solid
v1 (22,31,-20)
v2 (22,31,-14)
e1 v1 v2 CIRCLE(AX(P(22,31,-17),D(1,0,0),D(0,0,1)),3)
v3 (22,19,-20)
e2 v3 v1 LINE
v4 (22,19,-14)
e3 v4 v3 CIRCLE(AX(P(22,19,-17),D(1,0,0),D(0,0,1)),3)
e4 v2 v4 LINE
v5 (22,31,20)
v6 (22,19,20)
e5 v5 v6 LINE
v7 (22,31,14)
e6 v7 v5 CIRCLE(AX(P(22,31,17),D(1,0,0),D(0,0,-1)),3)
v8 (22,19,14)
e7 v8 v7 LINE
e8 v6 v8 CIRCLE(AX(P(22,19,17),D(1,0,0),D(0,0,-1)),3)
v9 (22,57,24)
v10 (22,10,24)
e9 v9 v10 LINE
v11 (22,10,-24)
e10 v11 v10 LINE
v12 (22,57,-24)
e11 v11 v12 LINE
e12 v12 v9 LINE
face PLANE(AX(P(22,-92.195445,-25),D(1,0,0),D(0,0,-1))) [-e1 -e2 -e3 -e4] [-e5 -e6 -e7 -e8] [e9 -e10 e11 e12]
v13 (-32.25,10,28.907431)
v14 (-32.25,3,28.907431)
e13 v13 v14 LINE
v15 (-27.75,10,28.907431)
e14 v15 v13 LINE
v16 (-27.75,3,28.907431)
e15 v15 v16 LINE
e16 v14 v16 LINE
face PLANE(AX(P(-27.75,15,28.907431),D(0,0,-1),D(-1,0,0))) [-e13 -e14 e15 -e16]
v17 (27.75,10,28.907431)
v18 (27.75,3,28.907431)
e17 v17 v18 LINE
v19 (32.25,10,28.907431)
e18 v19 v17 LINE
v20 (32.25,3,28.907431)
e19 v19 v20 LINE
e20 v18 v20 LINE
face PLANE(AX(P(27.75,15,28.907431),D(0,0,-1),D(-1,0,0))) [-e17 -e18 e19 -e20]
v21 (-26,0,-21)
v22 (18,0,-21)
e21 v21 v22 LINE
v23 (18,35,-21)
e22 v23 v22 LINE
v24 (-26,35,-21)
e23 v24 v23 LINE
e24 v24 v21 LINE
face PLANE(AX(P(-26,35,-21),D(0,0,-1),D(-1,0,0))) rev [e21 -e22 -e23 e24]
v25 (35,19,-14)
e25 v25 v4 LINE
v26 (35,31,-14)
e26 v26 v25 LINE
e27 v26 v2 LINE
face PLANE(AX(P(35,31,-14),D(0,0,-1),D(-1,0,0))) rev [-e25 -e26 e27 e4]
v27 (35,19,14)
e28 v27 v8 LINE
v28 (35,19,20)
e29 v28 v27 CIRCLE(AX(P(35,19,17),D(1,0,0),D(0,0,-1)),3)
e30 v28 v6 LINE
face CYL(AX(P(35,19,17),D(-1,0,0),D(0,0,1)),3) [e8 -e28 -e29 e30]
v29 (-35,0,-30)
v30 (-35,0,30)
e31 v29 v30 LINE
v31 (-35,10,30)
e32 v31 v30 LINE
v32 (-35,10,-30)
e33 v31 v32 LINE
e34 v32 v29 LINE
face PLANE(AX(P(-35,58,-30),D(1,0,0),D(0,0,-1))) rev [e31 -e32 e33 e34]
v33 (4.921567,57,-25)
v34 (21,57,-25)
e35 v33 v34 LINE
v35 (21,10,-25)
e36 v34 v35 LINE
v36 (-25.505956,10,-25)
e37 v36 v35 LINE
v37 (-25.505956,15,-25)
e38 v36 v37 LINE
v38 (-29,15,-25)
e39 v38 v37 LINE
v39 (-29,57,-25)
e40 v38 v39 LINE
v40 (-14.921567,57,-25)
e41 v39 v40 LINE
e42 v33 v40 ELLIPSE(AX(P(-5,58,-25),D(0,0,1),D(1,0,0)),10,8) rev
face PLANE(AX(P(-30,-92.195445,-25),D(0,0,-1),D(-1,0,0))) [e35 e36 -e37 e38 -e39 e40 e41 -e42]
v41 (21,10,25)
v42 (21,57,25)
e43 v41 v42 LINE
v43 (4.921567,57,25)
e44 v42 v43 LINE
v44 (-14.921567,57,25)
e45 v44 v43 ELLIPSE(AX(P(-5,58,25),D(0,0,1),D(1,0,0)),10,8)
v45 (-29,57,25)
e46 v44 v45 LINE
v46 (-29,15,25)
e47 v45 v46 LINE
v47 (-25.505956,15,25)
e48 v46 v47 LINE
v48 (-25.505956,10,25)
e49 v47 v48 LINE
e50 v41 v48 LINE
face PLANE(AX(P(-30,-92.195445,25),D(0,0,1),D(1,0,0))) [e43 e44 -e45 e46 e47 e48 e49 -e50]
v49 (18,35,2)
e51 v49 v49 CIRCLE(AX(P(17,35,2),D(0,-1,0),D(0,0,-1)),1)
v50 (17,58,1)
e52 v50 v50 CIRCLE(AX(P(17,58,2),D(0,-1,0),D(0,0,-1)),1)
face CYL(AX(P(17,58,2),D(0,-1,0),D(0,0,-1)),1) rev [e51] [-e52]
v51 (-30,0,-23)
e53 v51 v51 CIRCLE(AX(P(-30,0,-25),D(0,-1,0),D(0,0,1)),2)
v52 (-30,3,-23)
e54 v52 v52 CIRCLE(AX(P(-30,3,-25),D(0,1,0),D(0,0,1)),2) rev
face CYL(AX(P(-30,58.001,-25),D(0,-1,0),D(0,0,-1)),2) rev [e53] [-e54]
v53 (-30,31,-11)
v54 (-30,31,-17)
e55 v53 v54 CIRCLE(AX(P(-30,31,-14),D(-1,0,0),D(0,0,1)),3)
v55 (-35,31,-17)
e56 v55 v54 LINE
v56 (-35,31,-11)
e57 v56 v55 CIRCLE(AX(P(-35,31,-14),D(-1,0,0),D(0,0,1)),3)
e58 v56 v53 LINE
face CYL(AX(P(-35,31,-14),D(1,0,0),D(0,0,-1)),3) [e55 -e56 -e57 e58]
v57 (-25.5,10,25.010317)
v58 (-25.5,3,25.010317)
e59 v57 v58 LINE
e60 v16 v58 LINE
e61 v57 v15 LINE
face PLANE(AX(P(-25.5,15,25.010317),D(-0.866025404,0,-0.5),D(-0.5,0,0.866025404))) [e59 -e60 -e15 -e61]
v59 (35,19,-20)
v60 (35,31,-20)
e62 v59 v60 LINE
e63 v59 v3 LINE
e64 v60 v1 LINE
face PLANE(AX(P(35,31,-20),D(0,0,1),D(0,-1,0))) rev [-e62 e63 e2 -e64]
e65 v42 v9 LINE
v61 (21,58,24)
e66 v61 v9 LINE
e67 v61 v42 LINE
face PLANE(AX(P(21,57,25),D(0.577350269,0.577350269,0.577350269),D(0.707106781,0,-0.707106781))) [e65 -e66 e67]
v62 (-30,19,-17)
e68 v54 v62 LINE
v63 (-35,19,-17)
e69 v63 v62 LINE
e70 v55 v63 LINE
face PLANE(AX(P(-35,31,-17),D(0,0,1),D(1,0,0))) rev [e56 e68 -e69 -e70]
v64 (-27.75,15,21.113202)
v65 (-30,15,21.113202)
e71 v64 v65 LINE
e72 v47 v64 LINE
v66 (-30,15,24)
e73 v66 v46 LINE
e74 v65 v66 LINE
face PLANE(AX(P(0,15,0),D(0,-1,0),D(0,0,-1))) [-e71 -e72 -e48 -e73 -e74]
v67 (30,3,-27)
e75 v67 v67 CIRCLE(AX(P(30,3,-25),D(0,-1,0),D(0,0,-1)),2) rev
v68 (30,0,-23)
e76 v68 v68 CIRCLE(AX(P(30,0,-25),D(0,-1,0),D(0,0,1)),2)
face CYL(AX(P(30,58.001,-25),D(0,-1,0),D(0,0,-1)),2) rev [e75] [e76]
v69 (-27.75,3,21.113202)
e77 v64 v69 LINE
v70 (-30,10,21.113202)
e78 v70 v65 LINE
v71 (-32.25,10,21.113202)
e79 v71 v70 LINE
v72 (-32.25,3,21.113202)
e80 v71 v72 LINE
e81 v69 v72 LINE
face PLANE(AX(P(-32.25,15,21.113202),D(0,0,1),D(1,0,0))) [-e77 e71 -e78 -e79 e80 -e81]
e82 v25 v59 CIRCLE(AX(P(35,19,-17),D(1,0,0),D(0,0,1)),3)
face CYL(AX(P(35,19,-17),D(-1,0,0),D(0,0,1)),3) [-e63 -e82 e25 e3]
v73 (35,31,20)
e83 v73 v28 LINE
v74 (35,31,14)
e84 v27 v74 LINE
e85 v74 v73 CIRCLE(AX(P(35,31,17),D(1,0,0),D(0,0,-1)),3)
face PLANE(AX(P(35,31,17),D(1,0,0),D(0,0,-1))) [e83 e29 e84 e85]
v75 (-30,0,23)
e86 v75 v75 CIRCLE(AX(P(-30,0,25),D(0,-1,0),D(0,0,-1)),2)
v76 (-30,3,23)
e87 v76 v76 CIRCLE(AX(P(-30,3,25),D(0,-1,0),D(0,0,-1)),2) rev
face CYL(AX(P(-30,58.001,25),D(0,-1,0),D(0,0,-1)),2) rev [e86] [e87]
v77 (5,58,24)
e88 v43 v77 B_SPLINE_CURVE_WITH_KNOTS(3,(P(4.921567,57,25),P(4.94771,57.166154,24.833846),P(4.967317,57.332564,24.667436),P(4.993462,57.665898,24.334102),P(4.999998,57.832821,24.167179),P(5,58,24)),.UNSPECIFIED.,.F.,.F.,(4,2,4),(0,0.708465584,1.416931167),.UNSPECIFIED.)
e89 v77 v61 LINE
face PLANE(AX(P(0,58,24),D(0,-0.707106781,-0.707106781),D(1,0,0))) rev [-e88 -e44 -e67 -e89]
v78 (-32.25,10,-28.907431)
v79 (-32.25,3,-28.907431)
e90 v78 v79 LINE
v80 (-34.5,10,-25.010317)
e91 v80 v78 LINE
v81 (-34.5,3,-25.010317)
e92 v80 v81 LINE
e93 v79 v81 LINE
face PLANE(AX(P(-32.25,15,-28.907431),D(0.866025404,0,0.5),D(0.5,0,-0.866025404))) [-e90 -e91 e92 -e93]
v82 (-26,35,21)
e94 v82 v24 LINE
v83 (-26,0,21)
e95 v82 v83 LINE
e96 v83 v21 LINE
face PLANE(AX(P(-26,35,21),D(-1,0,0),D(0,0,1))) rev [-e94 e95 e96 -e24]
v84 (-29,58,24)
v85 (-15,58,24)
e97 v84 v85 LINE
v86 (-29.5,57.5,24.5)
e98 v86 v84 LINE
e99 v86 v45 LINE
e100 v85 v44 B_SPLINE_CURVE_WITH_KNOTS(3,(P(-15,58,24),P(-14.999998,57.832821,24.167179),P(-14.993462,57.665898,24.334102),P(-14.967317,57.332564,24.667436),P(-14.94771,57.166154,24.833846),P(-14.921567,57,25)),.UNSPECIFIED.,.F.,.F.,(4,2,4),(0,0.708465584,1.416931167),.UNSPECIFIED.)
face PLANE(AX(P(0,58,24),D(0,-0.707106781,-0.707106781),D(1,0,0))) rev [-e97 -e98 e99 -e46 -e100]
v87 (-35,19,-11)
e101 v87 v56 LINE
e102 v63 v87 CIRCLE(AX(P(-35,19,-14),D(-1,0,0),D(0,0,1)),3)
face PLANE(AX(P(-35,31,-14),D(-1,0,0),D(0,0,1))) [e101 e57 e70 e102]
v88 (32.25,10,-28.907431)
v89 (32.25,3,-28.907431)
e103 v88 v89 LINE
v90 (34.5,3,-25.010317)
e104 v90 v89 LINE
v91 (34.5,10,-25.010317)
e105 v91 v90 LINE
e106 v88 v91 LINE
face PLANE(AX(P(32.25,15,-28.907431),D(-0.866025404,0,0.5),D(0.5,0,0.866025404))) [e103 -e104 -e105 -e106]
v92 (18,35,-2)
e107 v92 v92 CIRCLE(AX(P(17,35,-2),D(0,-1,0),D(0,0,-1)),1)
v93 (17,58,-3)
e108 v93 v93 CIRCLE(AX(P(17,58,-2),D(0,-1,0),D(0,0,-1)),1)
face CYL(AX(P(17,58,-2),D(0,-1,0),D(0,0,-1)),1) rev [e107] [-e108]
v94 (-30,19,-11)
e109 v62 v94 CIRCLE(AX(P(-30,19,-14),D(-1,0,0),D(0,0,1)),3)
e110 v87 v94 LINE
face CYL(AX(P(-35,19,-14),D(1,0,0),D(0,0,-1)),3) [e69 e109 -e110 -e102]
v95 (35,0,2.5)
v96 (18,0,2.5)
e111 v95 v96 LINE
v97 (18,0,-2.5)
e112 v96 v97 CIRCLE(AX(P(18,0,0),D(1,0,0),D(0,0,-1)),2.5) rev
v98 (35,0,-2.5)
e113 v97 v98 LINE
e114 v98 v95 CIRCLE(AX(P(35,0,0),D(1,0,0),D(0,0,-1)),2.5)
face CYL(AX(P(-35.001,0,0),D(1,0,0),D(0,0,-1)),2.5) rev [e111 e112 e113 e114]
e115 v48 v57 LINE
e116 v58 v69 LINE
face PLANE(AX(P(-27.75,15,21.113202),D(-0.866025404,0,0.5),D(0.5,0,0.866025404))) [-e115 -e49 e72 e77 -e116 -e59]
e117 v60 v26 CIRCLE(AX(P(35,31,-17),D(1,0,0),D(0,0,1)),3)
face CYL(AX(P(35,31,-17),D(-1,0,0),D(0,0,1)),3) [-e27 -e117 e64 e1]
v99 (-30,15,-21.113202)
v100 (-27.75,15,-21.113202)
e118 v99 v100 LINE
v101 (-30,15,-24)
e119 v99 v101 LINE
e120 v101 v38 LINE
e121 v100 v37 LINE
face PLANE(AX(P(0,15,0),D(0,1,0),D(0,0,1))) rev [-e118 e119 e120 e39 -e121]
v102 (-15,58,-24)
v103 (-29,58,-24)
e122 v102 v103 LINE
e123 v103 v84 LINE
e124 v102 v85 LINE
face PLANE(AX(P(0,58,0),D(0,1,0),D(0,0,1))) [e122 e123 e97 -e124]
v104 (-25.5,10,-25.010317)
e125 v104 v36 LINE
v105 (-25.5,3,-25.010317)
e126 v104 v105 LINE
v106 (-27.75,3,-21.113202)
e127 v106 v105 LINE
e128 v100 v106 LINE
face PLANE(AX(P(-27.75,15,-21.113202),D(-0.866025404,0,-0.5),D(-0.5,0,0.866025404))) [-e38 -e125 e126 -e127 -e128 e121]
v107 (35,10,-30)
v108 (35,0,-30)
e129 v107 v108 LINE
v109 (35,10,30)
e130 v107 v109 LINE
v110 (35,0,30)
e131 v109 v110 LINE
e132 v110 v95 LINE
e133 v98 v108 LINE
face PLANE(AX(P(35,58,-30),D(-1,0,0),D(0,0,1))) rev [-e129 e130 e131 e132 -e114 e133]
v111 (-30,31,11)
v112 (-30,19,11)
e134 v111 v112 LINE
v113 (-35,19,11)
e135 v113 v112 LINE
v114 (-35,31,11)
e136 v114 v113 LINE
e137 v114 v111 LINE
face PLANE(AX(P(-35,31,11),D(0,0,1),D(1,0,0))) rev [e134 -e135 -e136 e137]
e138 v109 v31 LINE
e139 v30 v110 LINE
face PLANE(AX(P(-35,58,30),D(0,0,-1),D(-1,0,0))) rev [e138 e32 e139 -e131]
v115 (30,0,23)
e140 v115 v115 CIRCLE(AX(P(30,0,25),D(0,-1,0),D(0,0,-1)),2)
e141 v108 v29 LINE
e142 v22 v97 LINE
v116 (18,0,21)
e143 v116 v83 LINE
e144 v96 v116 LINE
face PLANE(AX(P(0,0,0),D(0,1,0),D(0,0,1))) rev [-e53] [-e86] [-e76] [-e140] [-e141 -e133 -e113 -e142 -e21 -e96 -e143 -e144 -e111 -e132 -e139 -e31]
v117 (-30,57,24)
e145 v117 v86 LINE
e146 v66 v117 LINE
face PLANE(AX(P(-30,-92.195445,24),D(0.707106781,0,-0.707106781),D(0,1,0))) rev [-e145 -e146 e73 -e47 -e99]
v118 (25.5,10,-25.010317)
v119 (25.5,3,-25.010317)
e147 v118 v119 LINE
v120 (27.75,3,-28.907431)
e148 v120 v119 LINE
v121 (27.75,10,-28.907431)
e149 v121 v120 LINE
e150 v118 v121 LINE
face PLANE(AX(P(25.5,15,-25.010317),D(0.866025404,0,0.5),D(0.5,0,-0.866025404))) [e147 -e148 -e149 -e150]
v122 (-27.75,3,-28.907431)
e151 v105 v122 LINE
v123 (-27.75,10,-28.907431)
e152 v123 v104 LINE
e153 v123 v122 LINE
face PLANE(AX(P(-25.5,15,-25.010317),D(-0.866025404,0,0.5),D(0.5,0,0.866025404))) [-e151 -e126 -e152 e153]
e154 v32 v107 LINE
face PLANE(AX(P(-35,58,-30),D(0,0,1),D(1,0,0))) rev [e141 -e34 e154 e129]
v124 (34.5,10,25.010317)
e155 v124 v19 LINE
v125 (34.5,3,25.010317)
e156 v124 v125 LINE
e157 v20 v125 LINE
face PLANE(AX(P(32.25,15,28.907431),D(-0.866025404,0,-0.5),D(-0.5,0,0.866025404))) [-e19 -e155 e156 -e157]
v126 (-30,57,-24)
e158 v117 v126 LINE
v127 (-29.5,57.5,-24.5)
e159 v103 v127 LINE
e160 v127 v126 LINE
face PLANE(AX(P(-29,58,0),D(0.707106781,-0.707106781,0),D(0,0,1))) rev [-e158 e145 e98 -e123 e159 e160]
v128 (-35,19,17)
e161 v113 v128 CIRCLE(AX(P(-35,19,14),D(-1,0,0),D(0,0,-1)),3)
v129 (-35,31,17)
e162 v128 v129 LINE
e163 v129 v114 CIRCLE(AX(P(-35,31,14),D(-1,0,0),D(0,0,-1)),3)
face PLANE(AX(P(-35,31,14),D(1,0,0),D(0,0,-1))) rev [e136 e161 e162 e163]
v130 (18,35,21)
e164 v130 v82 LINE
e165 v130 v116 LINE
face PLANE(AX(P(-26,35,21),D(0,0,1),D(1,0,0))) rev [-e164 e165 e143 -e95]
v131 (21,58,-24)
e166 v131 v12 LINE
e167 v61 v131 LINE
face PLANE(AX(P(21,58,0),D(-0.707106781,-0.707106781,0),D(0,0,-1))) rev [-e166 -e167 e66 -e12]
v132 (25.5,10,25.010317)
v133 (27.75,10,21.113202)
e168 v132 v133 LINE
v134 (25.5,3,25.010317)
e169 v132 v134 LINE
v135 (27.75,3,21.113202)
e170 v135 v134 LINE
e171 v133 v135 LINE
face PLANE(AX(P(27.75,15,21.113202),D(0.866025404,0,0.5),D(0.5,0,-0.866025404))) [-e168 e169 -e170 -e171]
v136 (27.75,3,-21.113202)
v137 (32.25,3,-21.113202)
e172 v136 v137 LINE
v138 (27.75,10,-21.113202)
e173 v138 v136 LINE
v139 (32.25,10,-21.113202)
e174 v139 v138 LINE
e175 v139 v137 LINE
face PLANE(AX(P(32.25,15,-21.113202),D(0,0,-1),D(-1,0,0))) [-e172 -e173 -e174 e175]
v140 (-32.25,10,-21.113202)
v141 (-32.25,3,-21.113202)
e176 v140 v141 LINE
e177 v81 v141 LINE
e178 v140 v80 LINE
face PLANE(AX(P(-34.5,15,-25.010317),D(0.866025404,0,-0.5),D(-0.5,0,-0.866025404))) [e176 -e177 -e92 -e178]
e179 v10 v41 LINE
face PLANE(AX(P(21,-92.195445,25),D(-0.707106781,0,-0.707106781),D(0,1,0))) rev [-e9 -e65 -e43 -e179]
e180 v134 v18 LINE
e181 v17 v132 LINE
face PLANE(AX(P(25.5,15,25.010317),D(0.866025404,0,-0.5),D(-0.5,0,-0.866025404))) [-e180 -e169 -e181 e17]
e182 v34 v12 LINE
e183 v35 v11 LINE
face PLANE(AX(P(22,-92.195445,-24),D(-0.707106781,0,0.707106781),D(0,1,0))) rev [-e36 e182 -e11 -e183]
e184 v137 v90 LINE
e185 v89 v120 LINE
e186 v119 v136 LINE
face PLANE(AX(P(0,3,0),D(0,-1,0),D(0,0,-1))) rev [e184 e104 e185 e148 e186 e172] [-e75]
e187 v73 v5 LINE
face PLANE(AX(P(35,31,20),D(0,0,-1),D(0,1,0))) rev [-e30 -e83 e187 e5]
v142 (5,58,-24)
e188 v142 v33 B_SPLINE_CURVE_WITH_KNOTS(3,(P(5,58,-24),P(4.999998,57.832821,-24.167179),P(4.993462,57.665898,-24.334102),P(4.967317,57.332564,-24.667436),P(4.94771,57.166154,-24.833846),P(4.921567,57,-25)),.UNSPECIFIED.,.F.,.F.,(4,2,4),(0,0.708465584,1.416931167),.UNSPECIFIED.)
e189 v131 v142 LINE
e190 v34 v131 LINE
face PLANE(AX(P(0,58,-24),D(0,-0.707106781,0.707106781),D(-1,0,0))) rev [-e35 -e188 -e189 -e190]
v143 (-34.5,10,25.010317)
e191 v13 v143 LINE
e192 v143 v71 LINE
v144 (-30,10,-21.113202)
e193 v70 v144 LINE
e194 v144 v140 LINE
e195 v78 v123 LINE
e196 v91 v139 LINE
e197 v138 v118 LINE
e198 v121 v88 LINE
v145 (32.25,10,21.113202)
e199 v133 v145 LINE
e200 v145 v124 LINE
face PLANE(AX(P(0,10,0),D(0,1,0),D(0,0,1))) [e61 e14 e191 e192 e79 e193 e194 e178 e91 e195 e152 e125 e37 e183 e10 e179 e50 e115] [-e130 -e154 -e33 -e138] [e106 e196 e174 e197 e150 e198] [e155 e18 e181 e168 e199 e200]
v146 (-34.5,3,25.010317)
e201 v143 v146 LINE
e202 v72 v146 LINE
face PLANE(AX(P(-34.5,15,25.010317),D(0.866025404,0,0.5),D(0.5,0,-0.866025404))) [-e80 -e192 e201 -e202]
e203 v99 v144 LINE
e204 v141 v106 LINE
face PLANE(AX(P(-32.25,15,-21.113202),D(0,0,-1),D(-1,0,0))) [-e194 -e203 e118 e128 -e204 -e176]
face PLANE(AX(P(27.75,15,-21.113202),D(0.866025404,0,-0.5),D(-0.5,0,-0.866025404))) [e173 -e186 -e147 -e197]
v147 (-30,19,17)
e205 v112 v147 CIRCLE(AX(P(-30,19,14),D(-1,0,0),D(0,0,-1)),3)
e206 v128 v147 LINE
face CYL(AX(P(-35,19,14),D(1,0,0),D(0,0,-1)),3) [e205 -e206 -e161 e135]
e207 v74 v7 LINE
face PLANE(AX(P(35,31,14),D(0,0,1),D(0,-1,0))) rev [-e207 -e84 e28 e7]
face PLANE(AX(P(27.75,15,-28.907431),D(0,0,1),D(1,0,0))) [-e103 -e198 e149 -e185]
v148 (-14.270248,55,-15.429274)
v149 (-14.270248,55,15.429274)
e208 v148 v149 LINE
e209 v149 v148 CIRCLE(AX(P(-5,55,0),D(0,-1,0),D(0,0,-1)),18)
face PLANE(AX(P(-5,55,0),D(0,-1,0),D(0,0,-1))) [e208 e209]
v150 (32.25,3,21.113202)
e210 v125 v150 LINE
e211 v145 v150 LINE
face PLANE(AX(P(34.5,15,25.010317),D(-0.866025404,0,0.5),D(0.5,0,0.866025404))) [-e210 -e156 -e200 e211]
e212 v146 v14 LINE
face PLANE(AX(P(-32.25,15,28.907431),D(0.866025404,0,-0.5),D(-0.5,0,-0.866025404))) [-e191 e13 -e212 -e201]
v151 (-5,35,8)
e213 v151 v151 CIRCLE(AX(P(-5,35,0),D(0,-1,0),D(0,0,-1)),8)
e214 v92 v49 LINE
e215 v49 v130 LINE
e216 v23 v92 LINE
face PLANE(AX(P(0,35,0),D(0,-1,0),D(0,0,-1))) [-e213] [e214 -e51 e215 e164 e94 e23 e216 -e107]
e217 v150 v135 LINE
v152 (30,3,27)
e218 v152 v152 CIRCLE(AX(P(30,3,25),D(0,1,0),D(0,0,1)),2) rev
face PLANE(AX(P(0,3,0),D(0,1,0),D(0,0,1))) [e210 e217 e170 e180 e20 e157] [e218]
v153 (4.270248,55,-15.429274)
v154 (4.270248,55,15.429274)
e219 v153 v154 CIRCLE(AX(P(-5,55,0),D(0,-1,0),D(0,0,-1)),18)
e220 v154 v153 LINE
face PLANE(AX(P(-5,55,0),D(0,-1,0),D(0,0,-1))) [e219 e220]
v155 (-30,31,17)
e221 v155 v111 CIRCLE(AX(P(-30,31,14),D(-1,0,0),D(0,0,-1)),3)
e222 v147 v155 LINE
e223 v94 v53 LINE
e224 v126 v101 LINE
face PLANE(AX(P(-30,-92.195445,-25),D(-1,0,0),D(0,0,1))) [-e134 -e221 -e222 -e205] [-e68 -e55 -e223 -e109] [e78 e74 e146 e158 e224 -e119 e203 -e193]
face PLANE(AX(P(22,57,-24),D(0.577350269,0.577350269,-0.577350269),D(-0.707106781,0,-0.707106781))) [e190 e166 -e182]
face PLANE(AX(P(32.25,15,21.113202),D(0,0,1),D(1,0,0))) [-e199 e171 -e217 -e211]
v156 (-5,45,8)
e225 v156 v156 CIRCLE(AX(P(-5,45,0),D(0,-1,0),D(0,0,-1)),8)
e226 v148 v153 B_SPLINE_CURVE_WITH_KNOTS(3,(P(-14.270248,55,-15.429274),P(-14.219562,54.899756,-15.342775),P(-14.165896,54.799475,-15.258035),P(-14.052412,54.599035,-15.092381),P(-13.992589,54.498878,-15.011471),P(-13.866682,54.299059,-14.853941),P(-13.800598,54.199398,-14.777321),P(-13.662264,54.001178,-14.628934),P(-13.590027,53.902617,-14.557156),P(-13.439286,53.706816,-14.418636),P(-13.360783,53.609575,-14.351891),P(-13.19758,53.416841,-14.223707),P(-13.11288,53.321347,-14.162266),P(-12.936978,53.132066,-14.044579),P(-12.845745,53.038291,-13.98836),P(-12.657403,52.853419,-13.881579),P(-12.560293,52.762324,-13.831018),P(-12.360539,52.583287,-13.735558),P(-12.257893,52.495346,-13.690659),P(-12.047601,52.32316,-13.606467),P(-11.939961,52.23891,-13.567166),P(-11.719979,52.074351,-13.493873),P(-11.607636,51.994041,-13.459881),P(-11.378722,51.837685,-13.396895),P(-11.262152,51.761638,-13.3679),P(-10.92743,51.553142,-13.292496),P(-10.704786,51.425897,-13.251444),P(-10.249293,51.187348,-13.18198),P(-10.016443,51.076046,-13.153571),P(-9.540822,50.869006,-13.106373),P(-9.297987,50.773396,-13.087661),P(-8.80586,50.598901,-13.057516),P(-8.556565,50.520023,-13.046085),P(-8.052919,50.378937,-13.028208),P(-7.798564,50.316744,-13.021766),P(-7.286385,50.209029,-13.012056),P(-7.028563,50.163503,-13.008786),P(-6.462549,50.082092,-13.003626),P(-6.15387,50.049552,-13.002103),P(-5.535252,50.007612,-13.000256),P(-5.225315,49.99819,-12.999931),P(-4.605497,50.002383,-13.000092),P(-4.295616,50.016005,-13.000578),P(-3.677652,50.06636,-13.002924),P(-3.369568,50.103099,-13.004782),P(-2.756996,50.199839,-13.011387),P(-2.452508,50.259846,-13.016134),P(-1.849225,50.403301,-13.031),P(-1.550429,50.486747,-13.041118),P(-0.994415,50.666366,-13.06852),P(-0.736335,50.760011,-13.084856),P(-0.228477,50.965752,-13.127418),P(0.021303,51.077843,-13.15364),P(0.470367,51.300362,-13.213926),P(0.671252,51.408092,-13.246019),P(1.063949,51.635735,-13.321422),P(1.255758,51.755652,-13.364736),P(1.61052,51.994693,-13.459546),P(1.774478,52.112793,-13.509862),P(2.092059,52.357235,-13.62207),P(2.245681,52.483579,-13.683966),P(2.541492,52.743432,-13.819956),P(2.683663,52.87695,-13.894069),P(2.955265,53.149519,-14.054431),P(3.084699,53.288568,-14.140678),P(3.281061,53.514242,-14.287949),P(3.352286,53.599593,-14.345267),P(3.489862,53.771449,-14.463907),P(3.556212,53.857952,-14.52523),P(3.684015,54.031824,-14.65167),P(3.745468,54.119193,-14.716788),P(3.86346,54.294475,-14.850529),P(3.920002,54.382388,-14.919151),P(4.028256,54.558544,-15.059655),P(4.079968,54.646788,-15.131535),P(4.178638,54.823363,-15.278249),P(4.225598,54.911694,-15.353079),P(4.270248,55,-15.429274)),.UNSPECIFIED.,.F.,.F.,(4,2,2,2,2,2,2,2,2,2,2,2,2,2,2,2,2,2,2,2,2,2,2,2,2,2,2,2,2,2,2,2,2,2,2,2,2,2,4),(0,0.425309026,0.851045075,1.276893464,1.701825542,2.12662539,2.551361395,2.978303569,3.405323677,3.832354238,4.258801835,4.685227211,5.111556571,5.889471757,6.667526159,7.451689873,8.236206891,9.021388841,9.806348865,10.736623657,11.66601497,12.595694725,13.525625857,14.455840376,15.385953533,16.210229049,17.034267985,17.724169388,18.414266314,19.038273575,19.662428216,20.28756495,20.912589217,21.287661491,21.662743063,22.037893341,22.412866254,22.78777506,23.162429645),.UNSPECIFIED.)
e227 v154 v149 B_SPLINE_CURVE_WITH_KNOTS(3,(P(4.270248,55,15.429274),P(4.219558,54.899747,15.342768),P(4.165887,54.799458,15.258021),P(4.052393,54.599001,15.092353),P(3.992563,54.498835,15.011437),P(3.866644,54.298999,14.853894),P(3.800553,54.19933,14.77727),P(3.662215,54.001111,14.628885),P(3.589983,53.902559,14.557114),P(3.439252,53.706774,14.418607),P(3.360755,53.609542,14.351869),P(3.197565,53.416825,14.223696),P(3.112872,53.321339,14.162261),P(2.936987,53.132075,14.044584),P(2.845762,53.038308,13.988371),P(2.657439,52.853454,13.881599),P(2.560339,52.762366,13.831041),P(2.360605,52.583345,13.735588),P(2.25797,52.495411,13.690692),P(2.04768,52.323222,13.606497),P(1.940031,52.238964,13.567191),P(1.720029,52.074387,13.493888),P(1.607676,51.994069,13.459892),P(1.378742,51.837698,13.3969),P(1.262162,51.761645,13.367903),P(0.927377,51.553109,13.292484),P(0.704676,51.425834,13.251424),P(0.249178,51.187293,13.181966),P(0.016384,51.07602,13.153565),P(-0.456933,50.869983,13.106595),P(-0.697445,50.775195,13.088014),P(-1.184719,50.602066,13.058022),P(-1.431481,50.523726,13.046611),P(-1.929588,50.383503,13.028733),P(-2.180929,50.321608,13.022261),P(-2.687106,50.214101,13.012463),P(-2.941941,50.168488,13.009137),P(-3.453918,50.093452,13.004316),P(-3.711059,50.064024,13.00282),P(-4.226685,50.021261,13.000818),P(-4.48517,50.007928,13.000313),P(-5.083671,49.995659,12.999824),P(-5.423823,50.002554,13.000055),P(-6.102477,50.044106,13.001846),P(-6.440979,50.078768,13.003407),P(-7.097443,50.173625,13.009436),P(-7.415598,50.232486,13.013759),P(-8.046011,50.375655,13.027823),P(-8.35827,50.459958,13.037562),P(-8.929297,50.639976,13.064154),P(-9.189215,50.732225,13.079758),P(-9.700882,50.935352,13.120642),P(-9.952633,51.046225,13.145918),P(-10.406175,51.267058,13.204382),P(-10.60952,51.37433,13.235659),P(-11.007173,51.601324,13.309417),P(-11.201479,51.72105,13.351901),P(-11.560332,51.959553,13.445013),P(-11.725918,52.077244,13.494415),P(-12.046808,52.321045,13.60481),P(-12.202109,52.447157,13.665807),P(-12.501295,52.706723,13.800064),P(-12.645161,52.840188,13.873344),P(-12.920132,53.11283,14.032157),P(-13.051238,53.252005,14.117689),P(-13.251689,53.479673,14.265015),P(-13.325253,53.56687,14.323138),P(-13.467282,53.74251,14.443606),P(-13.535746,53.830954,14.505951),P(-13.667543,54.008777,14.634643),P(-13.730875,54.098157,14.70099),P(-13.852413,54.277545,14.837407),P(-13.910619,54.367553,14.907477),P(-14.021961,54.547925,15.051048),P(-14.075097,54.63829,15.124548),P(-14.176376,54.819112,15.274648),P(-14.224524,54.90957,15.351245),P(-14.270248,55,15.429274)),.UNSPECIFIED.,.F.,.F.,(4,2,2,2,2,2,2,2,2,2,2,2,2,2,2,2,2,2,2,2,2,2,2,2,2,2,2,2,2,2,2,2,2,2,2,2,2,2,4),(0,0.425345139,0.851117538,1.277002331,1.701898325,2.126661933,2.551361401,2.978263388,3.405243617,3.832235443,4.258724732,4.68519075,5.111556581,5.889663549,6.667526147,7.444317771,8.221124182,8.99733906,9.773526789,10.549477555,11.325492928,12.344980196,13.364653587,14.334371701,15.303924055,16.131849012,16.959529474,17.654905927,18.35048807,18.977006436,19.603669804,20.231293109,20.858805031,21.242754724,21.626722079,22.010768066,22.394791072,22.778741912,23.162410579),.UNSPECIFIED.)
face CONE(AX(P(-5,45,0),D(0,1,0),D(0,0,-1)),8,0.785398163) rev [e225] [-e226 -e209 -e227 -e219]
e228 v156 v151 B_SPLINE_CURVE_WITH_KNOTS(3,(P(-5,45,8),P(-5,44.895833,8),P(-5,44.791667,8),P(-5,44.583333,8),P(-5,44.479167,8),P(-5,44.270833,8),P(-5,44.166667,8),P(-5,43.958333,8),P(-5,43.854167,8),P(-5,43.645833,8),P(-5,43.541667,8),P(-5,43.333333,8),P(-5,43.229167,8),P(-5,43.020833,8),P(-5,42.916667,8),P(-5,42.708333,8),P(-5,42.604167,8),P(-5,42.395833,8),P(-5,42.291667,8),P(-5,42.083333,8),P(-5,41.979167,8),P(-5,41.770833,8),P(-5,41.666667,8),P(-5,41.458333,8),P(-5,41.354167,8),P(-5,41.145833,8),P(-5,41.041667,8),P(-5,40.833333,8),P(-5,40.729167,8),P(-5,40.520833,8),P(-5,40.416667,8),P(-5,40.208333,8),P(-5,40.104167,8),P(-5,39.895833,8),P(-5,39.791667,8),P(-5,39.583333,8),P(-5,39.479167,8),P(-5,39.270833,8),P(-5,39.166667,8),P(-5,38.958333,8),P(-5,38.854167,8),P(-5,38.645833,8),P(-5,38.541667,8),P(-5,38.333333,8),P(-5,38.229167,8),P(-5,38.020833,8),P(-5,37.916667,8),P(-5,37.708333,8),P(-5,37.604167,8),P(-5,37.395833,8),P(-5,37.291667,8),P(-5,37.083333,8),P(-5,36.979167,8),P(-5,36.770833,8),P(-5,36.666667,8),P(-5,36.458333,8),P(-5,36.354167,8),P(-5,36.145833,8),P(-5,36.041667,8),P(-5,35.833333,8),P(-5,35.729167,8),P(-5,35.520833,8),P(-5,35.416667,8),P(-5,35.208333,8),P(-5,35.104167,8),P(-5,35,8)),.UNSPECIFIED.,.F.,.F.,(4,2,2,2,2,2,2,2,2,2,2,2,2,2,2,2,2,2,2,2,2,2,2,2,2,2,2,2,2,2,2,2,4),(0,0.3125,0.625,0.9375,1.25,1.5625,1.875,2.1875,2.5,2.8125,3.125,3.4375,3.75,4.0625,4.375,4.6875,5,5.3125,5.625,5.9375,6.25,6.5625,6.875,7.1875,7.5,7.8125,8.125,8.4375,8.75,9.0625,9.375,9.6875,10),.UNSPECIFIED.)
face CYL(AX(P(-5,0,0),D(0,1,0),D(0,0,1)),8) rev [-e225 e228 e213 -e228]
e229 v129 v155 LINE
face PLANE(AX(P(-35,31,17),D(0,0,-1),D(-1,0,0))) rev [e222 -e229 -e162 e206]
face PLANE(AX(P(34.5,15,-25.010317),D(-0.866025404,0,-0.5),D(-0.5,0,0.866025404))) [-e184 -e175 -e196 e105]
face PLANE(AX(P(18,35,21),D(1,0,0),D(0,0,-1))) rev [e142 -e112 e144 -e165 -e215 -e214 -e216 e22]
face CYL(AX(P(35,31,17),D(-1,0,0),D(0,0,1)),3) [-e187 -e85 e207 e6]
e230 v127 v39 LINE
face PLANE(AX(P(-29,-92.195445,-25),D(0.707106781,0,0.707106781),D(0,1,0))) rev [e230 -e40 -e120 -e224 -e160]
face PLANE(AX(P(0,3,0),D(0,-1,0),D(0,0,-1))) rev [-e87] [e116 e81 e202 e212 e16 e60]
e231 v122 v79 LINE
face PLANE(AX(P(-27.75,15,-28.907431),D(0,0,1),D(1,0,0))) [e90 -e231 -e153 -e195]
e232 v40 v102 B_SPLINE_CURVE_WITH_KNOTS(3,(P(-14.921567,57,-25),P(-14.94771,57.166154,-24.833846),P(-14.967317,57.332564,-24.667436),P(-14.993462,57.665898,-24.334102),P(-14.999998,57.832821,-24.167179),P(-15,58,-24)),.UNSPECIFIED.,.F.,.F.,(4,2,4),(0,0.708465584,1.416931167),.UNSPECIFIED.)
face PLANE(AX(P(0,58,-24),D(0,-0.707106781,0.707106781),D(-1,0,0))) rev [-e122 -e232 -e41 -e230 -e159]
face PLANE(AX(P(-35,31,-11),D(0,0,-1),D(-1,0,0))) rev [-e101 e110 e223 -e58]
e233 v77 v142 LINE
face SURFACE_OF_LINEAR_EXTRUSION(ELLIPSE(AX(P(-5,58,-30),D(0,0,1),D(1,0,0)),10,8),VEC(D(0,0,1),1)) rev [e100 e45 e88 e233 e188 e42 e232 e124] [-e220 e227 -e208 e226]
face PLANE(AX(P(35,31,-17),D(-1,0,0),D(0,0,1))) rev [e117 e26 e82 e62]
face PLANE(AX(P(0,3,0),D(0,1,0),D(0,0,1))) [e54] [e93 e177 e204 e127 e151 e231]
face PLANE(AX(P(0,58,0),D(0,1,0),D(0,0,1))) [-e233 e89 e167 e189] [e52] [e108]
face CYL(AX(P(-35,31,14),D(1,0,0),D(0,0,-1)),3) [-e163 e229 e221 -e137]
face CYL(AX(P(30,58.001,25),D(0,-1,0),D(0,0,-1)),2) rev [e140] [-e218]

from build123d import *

# Parameters (mm, degrees)
SKETCH_1_W               = 70
SKETCH_1_H               = 60
EXTRUDE_1_DEPTH          = 58
SKETCH_2_W               = 44
SKETCH_2_H               = 42
CUT_EXTRUDE_1_DEPTH      = 35
SKETCH_3_W               = 70
SKETCH_3_H               = 60
SKETCH_3_W_2             = 52
SKETCH_3_H_2             = 50
CUT_EXTRUDE_3_DEPTH      = 48
SKETCH_4_R               = 8
CUT_EXTRUDE_4_DEPTH      = 75.087785768
SKETCH_5_RX              = 10
SKETCH_5_RY              = 8
CUT_EXTRUDE_5_DEPTH      = 88.258237433
SKETCH_6_R               = 8
CUT_EXTRUDE_6_DEPTH      = 10
CUT_EXTRUDE_6_DRAFT      = 45
EXTRUDE_2_DEPTH          = 5
EXTRUDE_3_DEPTH          = 13
SKETCH_11_R              = 1
CUT_EXTRUDE_7_DEPTH      = 58.879184514
CUT_EXTRUDE_8_REACH      = 97.729
SKETCH_13_R              = 2.5
CHAMFER_1_SIZE           = 1
CUT_EXTRUDE_9_DEPTH      = 5
CUT_EXTRUDE_9_DEPTH_BACK = 7
CUT_EXTRUDE_11_REACH     = 76.088
SKETCH_15_R              = 2


with BuildPart() as part:
    # 草图1 → 凸台-拉伸1 (new body)
    with BuildSketch(Plane(origin=(0, 0, 0), x_dir=(1, 0, 0), z_dir=(0, 1, 0))):
        Rectangle(SKETCH_1_W, SKETCH_1_H)
    extrude(amount=EXTRUDE_1_DEPTH)

    # 草图2 → 切除-拉伸1 (cut)
    with BuildSketch(Plane.XZ):
        with Locations((-4, 0)):
            Rectangle(SKETCH_2_W, SKETCH_2_H)
    extrude(amount=-CUT_EXTRUDE_1_DEPTH, mode=Mode.SUBTRACT)

    # 草图3 → 切除-拉伸3 (cut)
    with BuildSketch(Plane(origin=(0, 58, 0), x_dir=(1, 0, 0), z_dir=(0, 1, 0))):
        Rectangle(SKETCH_3_W, SKETCH_3_H)
        with Locations((-4, 0)):
            Rectangle(SKETCH_3_W_2, SKETCH_3_H_2, mode=Mode.SUBTRACT)
    extrude(amount=-CUT_EXTRUDE_3_DEPTH, mode=Mode.SUBTRACT)

    # 草图4 → 切除-拉伸4 (cut, through all)
    with BuildSketch(Plane(origin=(0, 58, 0), x_dir=(1, 0, 0), z_dir=(0, 1, 0))):
        with Locations(Location((-5, 0, 0), (0, 0, 270))):
            Circle(SKETCH_4_R)
    extrude(amount=-CUT_EXTRUDE_4_DEPTH, mode=Mode.SUBTRACT)

    # 草图5 → 切除-拉伸5 (cut, through all)
    with BuildSketch(Plane.XY.offset(25)):
        with Locations((-5, 58)):
            Ellipse(SKETCH_5_RX, SKETCH_5_RY)
    extrude(amount=-CUT_EXTRUDE_5_DEPTH, mode=Mode.SUBTRACT)


with BuildPart() as cut_extrude_6_tool:
    # 草图6 → 切除-拉伸6 (with draft: the straight prism first)
    with BuildSketch(Plane(origin=(0, 45, 0), x_dir=(-1, 0, 0), z_dir=(0, -1, 0))):
        with Locations(Location((5, 0, 0), (0, 0, 270))):
            Circle(SKETCH_6_R)
    extrude(amount=-CUT_EXTRUDE_6_DEPTH)
    # 切除-拉伸6: the draft: its side faces are tilted about the plane it starts from
    cut_extrude_6_sides = [cut_extrude_6_tool.faces().sort_by_distance(p)[0] for p in [
        (-5, 50, -8),
    ]]
    draft(cut_extrude_6_sides, Plane(origin=(0, 45, 0), x_dir=(-1, 0, 0), z_dir=(0, -1, 0)), CUT_EXTRUDE_6_DRAFT)


with BuildPart() as part_1:
    add(part.part)

    # 切除-拉伸6: cut by cut_extrude_6_tool
    add(cut_extrude_6_tool.part, mode=Mode.SUBTRACT)

    # 草图9 → 凸台-拉伸2 (add)
    with BuildSketch(Plane.ZY.offset(30)):
        with BuildLine():
            Line((-11, 31), (-11, 19))
            ThreePointArc((-11, 19), (-14, 16), (-17, 19))
            Line((-17, 19), (-17, 31))
            ThreePointArc((-17, 31), (-14, 34), (-11, 31))
        make_face()
        with BuildLine():
            Line((11, 31), (11, 19))
            ThreePointArc((11, 19), (14, 16), (17, 19))
            Line((17, 19), (17, 31))
            ThreePointArc((17, 31), (14, 34), (11, 31))
        make_face()
    extrude(amount=EXTRUDE_2_DEPTH)

    # 草图10 → 凸台-拉伸3 (add)
    with BuildSketch(Plane(origin=(22, 0, 0), x_dir=(0, 0, -1), z_dir=(1, 0, 0))):
        with BuildLine():
            Line((-14, 31), (-14, 19))
            ThreePointArc((-14, 19), (-17, 16), (-20, 19))
            Line((-20, 19), (-20, 31))
            ThreePointArc((-20, 31), (-17, 34), (-14, 31))
        make_face()
        with BuildLine():
            Line((14, 31), (14, 19))
            ThreePointArc((14, 19), (17, 16), (20, 19))
            Line((20, 19), (20, 31))
            ThreePointArc((20, 31), (17, 34), (14, 31))
        make_face()
    extrude(amount=EXTRUDE_3_DEPTH)

    # 草图11 → 切除-拉伸7 (cut, through all)
    with BuildSketch(Plane.XZ.offset(-35)):
        with Locations(Location((17, -2, 0), (0, 0, 270))):
            Circle(SKETCH_11_R)
        with Locations(Location((17, 2, 0), (0, 0, 270))):
            Circle(SKETCH_11_R)
    extrude(amount=-CUT_EXTRUDE_7_DEPTH, mode=Mode.SUBTRACT)

    # 草图13 → 切除-拉伸8 (cut, up to next)
    with BuildSketch(Plane(origin=(35, 0, 0), x_dir=(0, 0, -1), z_dir=(1, 0, 0)), mode=Mode.PRIVATE) as cut_extrude_8_sk1:
        Circle(SKETCH_13_R)
    cut_extrude_8_tool1 = extrude(cut_extrude_8_sk1.sketch, amount=-CUT_EXTRUDE_8_REACH, mode=Mode.PRIVATE) & part_1.part
    add(cut_extrude_8_tool1.solids().sort_by_distance((35, 0, 0))[0], mode=Mode.SUBTRACT)

    # 倒角1
    chamfer_1_edges = [part_1.edges().sort_by_distance(p)[0] for p in [
        (-30, 58, 0),
        (-22.5, 58, 25),
    ]]
    chamfer(chamfer_1_edges, length=CHAMFER_1_SIZE)

    # 倒角2
    # the kernel refuses this chamfer: 1 mm, written as the material it takes off along each edge
    with BuildSketch(Plane(origin=(21.333333333, 57.333333333, -24.333333333), x_dir=(-0.7071067811865475, 0, -0.7071067811865475), z_dir=(0.5773502691896258, 0.5773502691896258, -0.5773502691896258))) as chamfer_2_piece_1:
        Polygon((-0.707106781, -0.40824829), (0.707106781, -0.40824829), (0, 0.816496581), align=None)
    extrude(amount=1.270170592, mode=Mode.SUBTRACT)
    with BuildSketch(Plane(origin=(21.333333333, 57.333333333, 24.333333333), x_dir=(-0.7071067811865475, 0, 0.7071067811865475), z_dir=(0.5773502691896258, 0.5773502691896258, 0.5773502691896258))) as chamfer_2_piece_2:
        Polygon((-0.707106781, 0.40824829), (0.707106781, 0.40824829), (0, -0.816496581), align=None)
    extrude(amount=1.270170592, mode=Mode.SUBTRACT)
    with BuildSketch(Plane(origin=(-30, 59.571682988, -25), x_dir=(-0.027495876610585647, 0, 0.9996219169112968), z_dir=(0, -1, 0))) as chamfer_2_piece_3:
        with BuildLine():
            Line((1.028673195, 0), (-0.056547155, -1.027117794))
            Line((-0.056547155, -1.027117794), (-0.076539593, -1.026567876))
            ThreePointArc((-0.076539593, -1.026567876), (-0.034129227, -0.51339783), (-0.019992438, 0.000549918))
            Line((-0.019992438, 0.000549918), (0.000549918, 0.019992438))
            ThreePointArc((0.000549918, 0.019992438), (0.514497665, 0.00585565), (1.029223113, 0.019992438))
            Line((1.029223113, 0.019992438), (1.028673195, 0))
        make_face()
    extrude(amount=49.571682988, mode=Mode.SUBTRACT)
    with BuildSketch(Plane(origin=(-30, 59.571682988, 25), x_dir=(-0.027495876610585647, 0, -0.9996219169112968), z_dir=(0, -1, 0))) as chamfer_2_piece_4:
        with BuildLine():
            Line((1.028673195, 0), (-0.056547155, 1.027117794))
            Line((-0.056547155, 1.027117794), (-0.076539593, 1.026567876))
            ThreePointArc((-0.076539593, 1.026567876), (-0.034129227, 0.51339783), (-0.019992438, -0.000549918))
            Line((-0.019992438, -0.000549918), (0.000549918, -0.019992438))
            ThreePointArc((0.000549918, -0.019992438), (0.514497665, -0.00585565), (1.029223113, -0.019992438))
            Line((1.029223113, -0.019992438), (1.028673195, 0))
        make_face()
    extrude(amount=49.571682988, mode=Mode.SUBTRACT)
    with BuildSketch(Plane(origin=(22, 60.571682988, -25), x_dir=(-0.9996219169112968, 0, -0.027495876610585647), z_dir=(0, -1, 0))) as chamfer_2_piece_5:
        with BuildLine():
            Line((1.028673195, 0), (-0.056547155, -1.027117794))
            Line((-0.056547155, -1.027117794), (-0.076539593, -1.026567876))
            ThreePointArc((-0.076539593, -1.026567876), (-0.034129227, -0.51339783), (-0.019992438, 0.000549918))
            Line((-0.019992438, 0.000549918), (0.000549918, 0.019992438))
            ThreePointArc((0.000549918, 0.019992438), (0.514497665, 0.00585565), (1.029223113, 0.019992438))
            Line((1.029223113, 0.019992438), (1.028673195, 0))
        make_face()
    extrude(amount=50.571682988, mode=Mode.SUBTRACT)
    with BuildSketch(Plane(origin=(22, 60.571682988, 25), x_dir=(-0.9996219169112968, 0, 0.027495876610585647), z_dir=(0, -1, 0))) as chamfer_2_piece_6:
        with BuildLine():
            Line((1.028673195, 0), (-0.056547155, 1.027117794))
            Line((-0.056547155, 1.027117794), (-0.076539593, 1.026567876))
            ThreePointArc((-0.076539593, 1.026567876), (-0.034129227, 0.51339783), (-0.019992438, -0.000549918))
            Line((-0.019992438, -0.000549918), (0.000549918, -0.019992438))
            ThreePointArc((0.000549918, -0.019992438), (0.514497665, -0.00585565), (1.029223113, -0.019992438))
            Line((1.029223113, -0.019992438), (1.028673195, 0))
        make_face()
    extrude(amount=50.571682988, mode=Mode.SUBTRACT)
    with BuildSketch(Plane(origin=(24.571682988, 58, 25), x_dir=(0, -0.9996219169112968, 0.02749587661058555), z_dir=(-1, 0, 0)), Plane(origin=(2.428317012, 58, -25), x_dir=(0, -0.9996219169112968, -0.02749587661058555), z_dir=(1, 0, 0))) as chamfer_2_piece_7:
        with BuildLine():
            Line((1.028673195, 0), (-0.056547155, -1.027117794))
            Line((-0.056547155, -1.027117794), (-0.076539593, -1.026567876))
            ThreePointArc((-0.076539593, -1.026567876), (-0.034129227, -0.51339783), (-0.019992438, 0.000549918))
            Line((-0.019992438, 0.000549918), (0.000549918, 0.019992438))
            ThreePointArc((0.000549918, 0.019992438), (0.514497665, 0.00585565), (1.029223113, 0.019992438))
            Line((1.029223113, 0.019992438), (1.028673195, 0))
        make_face()
    extrude(amount=22.143365976, mode=Mode.SUBTRACT)
    with BuildSketch(Plane(origin=(22, 58, -27.571682988), x_dir=(-0.9996219169112968, 0.0274958766105891, 0), z_dir=(0, 0, 1))) as chamfer_2_piece_8:
        with BuildLine():
            Line((1.028673195, 0), (-0.056547155, 1.027117794))
            Line((-0.056547155, 1.027117794), (-0.076539593, 1.026567876))
            ThreePointArc((-0.076539593, 1.026567876), (-0.034129227, 0.51339783), (-0.019992438, -0.000549918))
            Line((-0.019992438, -0.000549918), (0.000549918, -0.019992438))
            ThreePointArc((0.000549918, -0.019992438), (0.514497665, -0.00585565), (1.029223113, -0.019992438))
            Line((1.029223113, -0.019992438), (1.028673195, 0))
        make_face()
    extrude(amount=55.143365976, mode=Mode.SUBTRACT)
    with BuildSketch(Plane(origin=(-31.571682988, 58, -25), x_dir=(0, -0.9996219169112968, -0.02749587661058555), z_dir=(1, 0, 0))) as chamfer_2_piece_9:
        with BuildLine():
            Line((1.028673195, 0), (-0.056547155, -1.027117794))
            Line((-0.056547155, -1.027117794), (-0.076539593, -1.026567876))
            ThreePointArc((-0.076539593, -1.026567876), (-0.034129227, -0.51339783), (-0.019992438, 0.000549918))
            Line((-0.019992438, 0.000549918), (0.000549918, 0.019992438))
            ThreePointArc((0.000549918, 0.019992438), (0.514497665, 0.00585565), (1.029223113, 0.019992438))
            Line((1.029223113, 0.019992438), (1.028673195, 0))
        make_face()
    extrude(amount=19.143365976, mode=Mode.SUBTRACT)

    # 草图14 → 切除-拉伸9 (cut, two sides: drawn at the far end of the back side and taken through both)
    with BuildSketch(Plane(origin=(0, 10, 0), x_dir=(1, 0, 0), z_dir=(0, 1, 0)).offset(-CUT_EXTRUDE_9_DEPTH_BACK)):
        Polygon((25.5, 25.010316584), (27.75, 28.907430901), (32.25, 28.907430901), (34.5, 25.010316584), (32.25, 21.113202267), (27.75, 21.113202267), align=None)
        Polygon((-27.75, 21.113202267), (-25.5, 25.010316584), (-27.75, 28.907430901), (-32.25, 28.907430901), (-34.5, 25.010316584), (-32.25, 21.113202267), align=None)
        Polygon((27.75, -28.907430901), (32.25, -28.907430901), (34.5, -25.010316584), (32.25, -21.113202267), (27.75, -21.113202267), (25.5, -25.010316584), align=None)
        Polygon((-32.25, -21.113202267), (-27.75, -21.113202267), (-25.5, -25.010316584), (-27.75, -28.907430901), (-32.25, -28.907430901), (-34.5, -25.010316584), align=None)
    extrude(amount=CUT_EXTRUDE_9_DEPTH + CUT_EXTRUDE_9_DEPTH_BACK, mode=Mode.SUBTRACT)

    # 草图15 → 切除-拉伸11 (cut, up to next)
    with BuildSketch(Plane.XZ, mode=Mode.PRIVATE) as cut_extrude_11_sk1:
        with Locations(Location((-30, 25, 0), (0, 0, 270))):
            Circle(SKETCH_15_R)
    cut_extrude_11_tool1 = extrude(cut_extrude_11_sk1.sketch, amount=-CUT_EXTRUDE_11_REACH, mode=Mode.PRIVATE) & part_1.part
    # 草图15 → 切除-拉伸11 (cut, up to next)
    with BuildSketch(Plane.XZ, mode=Mode.PRIVATE) as cut_extrude_11_sk2:
        with Locations(Location((30, 25, 0), (0, 0, 270))):
            Circle(SKETCH_15_R)
    cut_extrude_11_tool2 = extrude(cut_extrude_11_sk2.sketch, amount=-CUT_EXTRUDE_11_REACH, mode=Mode.PRIVATE) & part_1.part
    # 草图15 → 切除-拉伸11 (cut, up to next)
    with BuildSketch(Plane.XZ, mode=Mode.PRIVATE) as cut_extrude_11_sk3:
        with Locations(Location((30, -25, 0), (0, 0, 270))):
            Circle(SKETCH_15_R)
    cut_extrude_11_tool3 = extrude(cut_extrude_11_sk3.sketch, amount=-CUT_EXTRUDE_11_REACH, mode=Mode.PRIVATE) & part_1.part
    # 草图15 → 切除-拉伸11 (cut, up to next)
    with BuildSketch(Plane.XZ, mode=Mode.PRIVATE) as cut_extrude_11_sk4:
        with Locations(Location((-30, -25, 0), (0, 0, 90))):
            Circle(SKETCH_15_R)
    cut_extrude_11_tool4 = extrude(cut_extrude_11_sk4.sketch, amount=-CUT_EXTRUDE_11_REACH, mode=Mode.PRIVATE) & part_1.part
    add(cut_extrude_11_tool1.solids().sort_by_distance((-30, 0, 25))[0], mode=Mode.SUBTRACT)
    add(cut_extrude_11_tool2.solids().sort_by_distance((30, 0, 25))[0], mode=Mode.SUBTRACT)
    add(cut_extrude_11_tool3.solids().sort_by_distance((30, 0, -25))[0], mode=Mode.SUBTRACT)
    add(cut_extrude_11_tool4.solids().sort_by_distance((-30, 0, -25))[0], mode=Mode.SUBTRACT)


solid = part_1.part
